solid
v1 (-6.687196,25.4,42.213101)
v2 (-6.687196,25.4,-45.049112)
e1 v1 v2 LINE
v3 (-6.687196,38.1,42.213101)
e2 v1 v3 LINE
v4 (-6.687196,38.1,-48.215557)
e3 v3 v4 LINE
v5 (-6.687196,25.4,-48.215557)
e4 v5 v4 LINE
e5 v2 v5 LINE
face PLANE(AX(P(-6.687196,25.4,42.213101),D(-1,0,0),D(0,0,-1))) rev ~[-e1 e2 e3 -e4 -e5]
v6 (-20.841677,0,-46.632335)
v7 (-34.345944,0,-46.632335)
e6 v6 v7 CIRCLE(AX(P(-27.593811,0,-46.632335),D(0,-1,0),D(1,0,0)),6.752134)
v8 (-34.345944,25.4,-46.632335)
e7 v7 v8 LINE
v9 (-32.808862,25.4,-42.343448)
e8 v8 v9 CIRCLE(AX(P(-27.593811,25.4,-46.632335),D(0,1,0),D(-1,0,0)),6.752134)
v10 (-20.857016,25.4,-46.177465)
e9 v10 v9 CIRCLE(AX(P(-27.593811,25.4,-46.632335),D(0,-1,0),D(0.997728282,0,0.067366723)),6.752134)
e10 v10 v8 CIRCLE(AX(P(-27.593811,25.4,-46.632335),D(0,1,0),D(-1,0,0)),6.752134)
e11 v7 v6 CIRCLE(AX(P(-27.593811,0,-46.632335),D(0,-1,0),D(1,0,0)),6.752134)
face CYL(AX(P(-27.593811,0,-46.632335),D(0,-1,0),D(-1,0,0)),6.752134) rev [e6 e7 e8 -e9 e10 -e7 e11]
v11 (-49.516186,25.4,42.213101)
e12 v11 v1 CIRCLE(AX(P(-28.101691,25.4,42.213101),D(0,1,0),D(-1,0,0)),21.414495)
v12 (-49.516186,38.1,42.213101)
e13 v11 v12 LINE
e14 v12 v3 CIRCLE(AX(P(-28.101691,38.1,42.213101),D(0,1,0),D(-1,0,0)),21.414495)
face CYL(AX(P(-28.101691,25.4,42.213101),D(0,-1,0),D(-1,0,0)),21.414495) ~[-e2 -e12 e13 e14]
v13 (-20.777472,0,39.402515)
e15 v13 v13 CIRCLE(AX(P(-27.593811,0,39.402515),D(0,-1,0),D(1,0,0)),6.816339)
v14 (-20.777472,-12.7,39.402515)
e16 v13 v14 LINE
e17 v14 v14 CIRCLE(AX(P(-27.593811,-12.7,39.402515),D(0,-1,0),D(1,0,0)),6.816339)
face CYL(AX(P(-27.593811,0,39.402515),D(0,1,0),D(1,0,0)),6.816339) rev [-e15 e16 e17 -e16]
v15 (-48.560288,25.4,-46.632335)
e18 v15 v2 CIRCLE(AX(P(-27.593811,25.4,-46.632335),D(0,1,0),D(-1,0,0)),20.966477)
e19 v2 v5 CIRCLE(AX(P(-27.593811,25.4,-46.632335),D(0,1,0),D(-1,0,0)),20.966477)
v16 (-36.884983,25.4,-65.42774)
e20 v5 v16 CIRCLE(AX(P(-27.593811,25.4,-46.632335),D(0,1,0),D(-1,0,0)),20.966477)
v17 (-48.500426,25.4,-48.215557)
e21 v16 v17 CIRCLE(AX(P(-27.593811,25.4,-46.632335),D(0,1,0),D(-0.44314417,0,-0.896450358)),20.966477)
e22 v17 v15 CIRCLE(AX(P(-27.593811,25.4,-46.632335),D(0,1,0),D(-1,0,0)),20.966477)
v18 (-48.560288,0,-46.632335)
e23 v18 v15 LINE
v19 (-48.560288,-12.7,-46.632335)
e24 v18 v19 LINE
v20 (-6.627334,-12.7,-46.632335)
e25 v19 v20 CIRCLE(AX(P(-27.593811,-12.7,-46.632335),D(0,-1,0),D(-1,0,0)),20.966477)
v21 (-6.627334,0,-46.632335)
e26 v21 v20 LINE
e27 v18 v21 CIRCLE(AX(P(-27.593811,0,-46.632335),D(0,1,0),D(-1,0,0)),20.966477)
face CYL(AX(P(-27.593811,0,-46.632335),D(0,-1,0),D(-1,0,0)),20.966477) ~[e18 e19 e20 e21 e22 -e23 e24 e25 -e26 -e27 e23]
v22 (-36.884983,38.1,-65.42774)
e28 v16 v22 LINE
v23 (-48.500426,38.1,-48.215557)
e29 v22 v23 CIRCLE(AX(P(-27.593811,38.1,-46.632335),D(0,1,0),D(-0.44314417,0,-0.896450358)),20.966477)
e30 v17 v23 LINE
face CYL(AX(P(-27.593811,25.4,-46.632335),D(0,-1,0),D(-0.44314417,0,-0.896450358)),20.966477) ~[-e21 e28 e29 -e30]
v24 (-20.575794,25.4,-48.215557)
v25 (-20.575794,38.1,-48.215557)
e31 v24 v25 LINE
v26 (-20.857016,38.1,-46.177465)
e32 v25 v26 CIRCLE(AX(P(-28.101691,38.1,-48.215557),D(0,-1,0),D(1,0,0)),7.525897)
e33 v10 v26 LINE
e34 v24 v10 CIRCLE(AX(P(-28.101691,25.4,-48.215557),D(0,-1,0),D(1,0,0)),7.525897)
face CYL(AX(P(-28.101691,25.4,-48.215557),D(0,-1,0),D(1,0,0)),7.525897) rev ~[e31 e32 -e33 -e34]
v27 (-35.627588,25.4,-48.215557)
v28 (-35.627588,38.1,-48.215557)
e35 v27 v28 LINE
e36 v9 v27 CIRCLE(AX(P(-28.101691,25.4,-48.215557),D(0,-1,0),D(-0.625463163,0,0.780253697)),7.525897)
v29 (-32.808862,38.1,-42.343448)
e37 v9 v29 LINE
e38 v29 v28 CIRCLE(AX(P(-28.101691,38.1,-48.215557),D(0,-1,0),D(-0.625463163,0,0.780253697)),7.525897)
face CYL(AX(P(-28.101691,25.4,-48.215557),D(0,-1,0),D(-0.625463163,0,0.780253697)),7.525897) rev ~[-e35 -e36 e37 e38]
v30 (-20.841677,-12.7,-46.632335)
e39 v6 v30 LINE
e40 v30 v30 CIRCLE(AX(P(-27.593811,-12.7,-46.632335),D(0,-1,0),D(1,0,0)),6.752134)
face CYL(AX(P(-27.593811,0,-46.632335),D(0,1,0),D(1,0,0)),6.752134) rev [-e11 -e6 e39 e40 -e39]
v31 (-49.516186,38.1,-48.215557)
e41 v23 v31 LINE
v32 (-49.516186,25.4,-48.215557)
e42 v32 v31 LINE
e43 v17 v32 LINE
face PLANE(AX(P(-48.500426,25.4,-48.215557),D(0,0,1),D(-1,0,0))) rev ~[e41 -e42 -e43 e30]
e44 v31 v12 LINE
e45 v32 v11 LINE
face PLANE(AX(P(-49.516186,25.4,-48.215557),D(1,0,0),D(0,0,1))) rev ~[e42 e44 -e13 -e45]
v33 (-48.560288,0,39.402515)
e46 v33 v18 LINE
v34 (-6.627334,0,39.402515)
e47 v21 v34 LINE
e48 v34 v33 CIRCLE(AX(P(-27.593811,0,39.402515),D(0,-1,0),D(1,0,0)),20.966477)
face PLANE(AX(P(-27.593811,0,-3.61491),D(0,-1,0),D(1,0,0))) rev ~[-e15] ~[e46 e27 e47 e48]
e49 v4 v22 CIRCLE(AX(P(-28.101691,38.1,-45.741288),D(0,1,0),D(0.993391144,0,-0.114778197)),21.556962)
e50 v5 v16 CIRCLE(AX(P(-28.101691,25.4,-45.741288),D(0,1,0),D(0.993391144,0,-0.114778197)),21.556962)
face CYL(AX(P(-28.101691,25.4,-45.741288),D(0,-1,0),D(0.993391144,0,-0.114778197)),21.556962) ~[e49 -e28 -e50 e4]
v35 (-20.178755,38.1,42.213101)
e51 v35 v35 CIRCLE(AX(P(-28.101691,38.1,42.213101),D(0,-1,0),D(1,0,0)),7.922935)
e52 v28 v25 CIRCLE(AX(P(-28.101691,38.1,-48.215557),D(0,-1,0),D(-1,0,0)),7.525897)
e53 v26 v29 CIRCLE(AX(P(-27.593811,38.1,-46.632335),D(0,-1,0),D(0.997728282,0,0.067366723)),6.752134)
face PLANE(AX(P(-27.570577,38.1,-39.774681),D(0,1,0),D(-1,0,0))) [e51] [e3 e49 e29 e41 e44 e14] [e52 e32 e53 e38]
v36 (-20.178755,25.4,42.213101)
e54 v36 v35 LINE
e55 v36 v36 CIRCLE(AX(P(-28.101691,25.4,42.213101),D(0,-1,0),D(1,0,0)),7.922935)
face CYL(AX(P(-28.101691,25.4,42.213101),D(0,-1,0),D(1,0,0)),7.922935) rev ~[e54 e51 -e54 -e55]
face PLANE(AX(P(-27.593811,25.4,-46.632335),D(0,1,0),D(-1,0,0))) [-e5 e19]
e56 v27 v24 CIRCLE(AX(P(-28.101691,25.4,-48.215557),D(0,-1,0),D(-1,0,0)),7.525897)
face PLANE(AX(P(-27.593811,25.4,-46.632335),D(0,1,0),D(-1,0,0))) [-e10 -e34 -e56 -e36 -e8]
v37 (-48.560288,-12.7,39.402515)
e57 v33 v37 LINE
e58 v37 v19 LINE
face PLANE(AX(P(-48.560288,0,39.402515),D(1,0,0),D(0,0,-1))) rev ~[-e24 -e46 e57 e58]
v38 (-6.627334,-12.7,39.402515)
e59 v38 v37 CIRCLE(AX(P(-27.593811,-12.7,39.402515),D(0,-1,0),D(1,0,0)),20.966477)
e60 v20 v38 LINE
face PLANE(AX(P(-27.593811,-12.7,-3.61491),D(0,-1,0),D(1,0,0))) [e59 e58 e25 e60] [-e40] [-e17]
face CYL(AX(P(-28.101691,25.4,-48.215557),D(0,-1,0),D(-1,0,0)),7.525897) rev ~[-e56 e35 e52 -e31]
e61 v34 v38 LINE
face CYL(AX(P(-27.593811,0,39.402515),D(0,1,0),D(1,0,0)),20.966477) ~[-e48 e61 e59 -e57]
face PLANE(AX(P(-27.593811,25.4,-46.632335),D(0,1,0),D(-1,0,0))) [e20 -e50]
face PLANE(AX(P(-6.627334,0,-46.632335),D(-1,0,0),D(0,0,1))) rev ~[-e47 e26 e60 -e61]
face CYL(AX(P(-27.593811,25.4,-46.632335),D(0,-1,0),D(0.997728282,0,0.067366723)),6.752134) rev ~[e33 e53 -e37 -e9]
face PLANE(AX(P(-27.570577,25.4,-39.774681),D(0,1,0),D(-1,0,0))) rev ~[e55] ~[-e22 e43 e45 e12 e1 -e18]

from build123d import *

# Parameters (mm, degrees)
F0_R     = 6.7521335394
F0_R_2   = 6.8163388515
F1_DEPTH = 12.7
F2_R     = 6.7521335394
F3_DEPTH = 25.4
F5_DEPTH = 12.7


# Not quite as in the source:
# - a length typed as a fraction of an inch, garbled in the dataset ("3 / 203.2 mm" for 3/8 in), is restored


with BuildPart() as f1:
    # F0 (on Front) → F1 (new body)
    with BuildSketch(Plane.XZ):
        with BuildLine():
            ThreePointArc((-6.6273338161, 39.4025146961), (-27.5938108098, 60.3689916898), (-48.5602878034, 39.4025146961))
            Line((-48.5602878034, 39.4025146961), (-48.5602878034, -46.63233459))
            ThreePointArc((-48.5602878034, -46.63233459), (-27.5938108098, -67.5988115836), (-6.6273338161, -46.63233459))
            Line((-6.6273338161, -46.63233459), (-6.6273338161, 39.4025146961))
        make_face()
        with Locations((-27.5938108098, -46.63233459)):
            Circle(F0_R, mode=Mode.SUBTRACT)
        with Locations((-27.5938108098, 39.4025146961)):
            Circle(F0_R_2, mode=Mode.SUBTRACT)
    extrude(amount=F1_DEPTH)

    # F2 (on face) → F3 (join)
    with BuildSketch(Plane(origin=(0, 0, 0), x_dir=(-1, 0, 0), z_dir=(0, 1, 0))):
        with BuildLine():
            ThreePointArc((6.6273338161, -46.63233459), (27.5938108098, -67.5988115836), (48.5602878034, -46.63233459))
            ThreePointArc((48.5602878034, -46.63233459), (27.5938108098, -25.6658575963), (6.6273338161, -46.63233459))
        make_face()
        with Locations((27.5938108098, -46.63233459)):
            Circle(F2_R, mode=Mode.SUBTRACT)
    extrude(amount=F3_DEPTH)

    # F4 (on face) → F5 (join)
    with BuildSketch(Plane(origin=(0, 25.4, 0), x_dir=(-1, 0, 0), z_dir=(0, 1, 0))):
        with BuildLine():
            Line((6.6871955224, -45.0491116899), (6.6871955224, -48.21555749))
            Line((6.6871955224, -48.21555749), (20.5757935859, -48.21555749))
            ThreePointArc((20.5757935859, -48.21555749), (20.6464307387, -47.1868562222), (20.8570162136, -46.1774654835))
            ThreePointArc((20.8570162136, -46.1774654835), (25.5313250881, -40.2029131555), (32.8088623121, -42.3434483519))
            ThreePointArc((32.8088623121, -42.3434483519), (34.8864096094, -44.9587614977), (35.6275880547, -48.21555749))
            Line((35.6275880547, -48.21555749), (48.5004260971, -48.21555749))
            ThreePointArc((48.5004260971, -48.21555749), (48.545317032, -47.4245116811), (48.5602878034, -46.63233459))
            ThreePointArc((48.5602878034, -46.63233459), (28.385987901, -25.6808283677), (6.6871955224, -45.0491116899))
        make_face()
        with BuildLine():
            Line((6.6871955224, 42.21310094), (6.6871955224, -45.0491116899))
            ThreePointArc((6.6871955224, -45.0491116899), (28.385987901, -25.6808283677), (48.5602878034, -46.63233459))
            ThreePointArc((48.5602878034, -46.63233459), (48.545317032, -47.4245116811), (48.5004260971, -48.21555749))
            Line((48.5004260971, -48.21555749), (49.5161861181, -48.21555749))
            Line((49.5161861181, -48.21555749), (49.5161861181, 42.21310094))
            Line((49.5161861181, 42.21310094), (36.0246261847, 42.21310094))
            ThreePointArc((36.0246261847, 42.21310094), (28.1016908203, 34.2901655755), (20.1787554558, 42.21310094))
            Line((20.1787554558, 42.21310094), (6.6871955224, 42.21310094))
        make_face()
        with BuildLine():
            Line((20.5757935859, -48.21555749), (6.6871955224, -48.21555749))
            ThreePointArc((6.6871955224, -48.21555749), (17.4268777521, -64.4696352981), (36.8849828604, -65.427740397))
            ThreePointArc((36.8849828604, -65.427740397), (44.9731491209, -58.3605807245), (48.5004260971, -48.21555749))
            Line((48.5004260971, -48.21555749), (35.6275880547, -48.21555749))
            ThreePointArc((35.6275880547, -48.21555749), (28.1016908203, -55.7414547244), (20.5757935859, -48.21555749))
        make_face()
        with BuildLine():
            ThreePointArc((49.5161861181, 42.21310094), (28.1016908203, 63.6275962378), (6.6871955224, 42.21310094))
            Line((6.6871955224, 42.21310094), (20.1787554558, 42.21310094))
            ThreePointArc((20.1787554558, 42.21310094), (28.1016908203, 50.1360363044), (36.0246261847, 42.21310094))
            Line((36.0246261847, 42.21310094), (49.5161861181, 42.21310094))
        make_face()
    extrude(amount=F5_DEPTH)


solid = f1.part
